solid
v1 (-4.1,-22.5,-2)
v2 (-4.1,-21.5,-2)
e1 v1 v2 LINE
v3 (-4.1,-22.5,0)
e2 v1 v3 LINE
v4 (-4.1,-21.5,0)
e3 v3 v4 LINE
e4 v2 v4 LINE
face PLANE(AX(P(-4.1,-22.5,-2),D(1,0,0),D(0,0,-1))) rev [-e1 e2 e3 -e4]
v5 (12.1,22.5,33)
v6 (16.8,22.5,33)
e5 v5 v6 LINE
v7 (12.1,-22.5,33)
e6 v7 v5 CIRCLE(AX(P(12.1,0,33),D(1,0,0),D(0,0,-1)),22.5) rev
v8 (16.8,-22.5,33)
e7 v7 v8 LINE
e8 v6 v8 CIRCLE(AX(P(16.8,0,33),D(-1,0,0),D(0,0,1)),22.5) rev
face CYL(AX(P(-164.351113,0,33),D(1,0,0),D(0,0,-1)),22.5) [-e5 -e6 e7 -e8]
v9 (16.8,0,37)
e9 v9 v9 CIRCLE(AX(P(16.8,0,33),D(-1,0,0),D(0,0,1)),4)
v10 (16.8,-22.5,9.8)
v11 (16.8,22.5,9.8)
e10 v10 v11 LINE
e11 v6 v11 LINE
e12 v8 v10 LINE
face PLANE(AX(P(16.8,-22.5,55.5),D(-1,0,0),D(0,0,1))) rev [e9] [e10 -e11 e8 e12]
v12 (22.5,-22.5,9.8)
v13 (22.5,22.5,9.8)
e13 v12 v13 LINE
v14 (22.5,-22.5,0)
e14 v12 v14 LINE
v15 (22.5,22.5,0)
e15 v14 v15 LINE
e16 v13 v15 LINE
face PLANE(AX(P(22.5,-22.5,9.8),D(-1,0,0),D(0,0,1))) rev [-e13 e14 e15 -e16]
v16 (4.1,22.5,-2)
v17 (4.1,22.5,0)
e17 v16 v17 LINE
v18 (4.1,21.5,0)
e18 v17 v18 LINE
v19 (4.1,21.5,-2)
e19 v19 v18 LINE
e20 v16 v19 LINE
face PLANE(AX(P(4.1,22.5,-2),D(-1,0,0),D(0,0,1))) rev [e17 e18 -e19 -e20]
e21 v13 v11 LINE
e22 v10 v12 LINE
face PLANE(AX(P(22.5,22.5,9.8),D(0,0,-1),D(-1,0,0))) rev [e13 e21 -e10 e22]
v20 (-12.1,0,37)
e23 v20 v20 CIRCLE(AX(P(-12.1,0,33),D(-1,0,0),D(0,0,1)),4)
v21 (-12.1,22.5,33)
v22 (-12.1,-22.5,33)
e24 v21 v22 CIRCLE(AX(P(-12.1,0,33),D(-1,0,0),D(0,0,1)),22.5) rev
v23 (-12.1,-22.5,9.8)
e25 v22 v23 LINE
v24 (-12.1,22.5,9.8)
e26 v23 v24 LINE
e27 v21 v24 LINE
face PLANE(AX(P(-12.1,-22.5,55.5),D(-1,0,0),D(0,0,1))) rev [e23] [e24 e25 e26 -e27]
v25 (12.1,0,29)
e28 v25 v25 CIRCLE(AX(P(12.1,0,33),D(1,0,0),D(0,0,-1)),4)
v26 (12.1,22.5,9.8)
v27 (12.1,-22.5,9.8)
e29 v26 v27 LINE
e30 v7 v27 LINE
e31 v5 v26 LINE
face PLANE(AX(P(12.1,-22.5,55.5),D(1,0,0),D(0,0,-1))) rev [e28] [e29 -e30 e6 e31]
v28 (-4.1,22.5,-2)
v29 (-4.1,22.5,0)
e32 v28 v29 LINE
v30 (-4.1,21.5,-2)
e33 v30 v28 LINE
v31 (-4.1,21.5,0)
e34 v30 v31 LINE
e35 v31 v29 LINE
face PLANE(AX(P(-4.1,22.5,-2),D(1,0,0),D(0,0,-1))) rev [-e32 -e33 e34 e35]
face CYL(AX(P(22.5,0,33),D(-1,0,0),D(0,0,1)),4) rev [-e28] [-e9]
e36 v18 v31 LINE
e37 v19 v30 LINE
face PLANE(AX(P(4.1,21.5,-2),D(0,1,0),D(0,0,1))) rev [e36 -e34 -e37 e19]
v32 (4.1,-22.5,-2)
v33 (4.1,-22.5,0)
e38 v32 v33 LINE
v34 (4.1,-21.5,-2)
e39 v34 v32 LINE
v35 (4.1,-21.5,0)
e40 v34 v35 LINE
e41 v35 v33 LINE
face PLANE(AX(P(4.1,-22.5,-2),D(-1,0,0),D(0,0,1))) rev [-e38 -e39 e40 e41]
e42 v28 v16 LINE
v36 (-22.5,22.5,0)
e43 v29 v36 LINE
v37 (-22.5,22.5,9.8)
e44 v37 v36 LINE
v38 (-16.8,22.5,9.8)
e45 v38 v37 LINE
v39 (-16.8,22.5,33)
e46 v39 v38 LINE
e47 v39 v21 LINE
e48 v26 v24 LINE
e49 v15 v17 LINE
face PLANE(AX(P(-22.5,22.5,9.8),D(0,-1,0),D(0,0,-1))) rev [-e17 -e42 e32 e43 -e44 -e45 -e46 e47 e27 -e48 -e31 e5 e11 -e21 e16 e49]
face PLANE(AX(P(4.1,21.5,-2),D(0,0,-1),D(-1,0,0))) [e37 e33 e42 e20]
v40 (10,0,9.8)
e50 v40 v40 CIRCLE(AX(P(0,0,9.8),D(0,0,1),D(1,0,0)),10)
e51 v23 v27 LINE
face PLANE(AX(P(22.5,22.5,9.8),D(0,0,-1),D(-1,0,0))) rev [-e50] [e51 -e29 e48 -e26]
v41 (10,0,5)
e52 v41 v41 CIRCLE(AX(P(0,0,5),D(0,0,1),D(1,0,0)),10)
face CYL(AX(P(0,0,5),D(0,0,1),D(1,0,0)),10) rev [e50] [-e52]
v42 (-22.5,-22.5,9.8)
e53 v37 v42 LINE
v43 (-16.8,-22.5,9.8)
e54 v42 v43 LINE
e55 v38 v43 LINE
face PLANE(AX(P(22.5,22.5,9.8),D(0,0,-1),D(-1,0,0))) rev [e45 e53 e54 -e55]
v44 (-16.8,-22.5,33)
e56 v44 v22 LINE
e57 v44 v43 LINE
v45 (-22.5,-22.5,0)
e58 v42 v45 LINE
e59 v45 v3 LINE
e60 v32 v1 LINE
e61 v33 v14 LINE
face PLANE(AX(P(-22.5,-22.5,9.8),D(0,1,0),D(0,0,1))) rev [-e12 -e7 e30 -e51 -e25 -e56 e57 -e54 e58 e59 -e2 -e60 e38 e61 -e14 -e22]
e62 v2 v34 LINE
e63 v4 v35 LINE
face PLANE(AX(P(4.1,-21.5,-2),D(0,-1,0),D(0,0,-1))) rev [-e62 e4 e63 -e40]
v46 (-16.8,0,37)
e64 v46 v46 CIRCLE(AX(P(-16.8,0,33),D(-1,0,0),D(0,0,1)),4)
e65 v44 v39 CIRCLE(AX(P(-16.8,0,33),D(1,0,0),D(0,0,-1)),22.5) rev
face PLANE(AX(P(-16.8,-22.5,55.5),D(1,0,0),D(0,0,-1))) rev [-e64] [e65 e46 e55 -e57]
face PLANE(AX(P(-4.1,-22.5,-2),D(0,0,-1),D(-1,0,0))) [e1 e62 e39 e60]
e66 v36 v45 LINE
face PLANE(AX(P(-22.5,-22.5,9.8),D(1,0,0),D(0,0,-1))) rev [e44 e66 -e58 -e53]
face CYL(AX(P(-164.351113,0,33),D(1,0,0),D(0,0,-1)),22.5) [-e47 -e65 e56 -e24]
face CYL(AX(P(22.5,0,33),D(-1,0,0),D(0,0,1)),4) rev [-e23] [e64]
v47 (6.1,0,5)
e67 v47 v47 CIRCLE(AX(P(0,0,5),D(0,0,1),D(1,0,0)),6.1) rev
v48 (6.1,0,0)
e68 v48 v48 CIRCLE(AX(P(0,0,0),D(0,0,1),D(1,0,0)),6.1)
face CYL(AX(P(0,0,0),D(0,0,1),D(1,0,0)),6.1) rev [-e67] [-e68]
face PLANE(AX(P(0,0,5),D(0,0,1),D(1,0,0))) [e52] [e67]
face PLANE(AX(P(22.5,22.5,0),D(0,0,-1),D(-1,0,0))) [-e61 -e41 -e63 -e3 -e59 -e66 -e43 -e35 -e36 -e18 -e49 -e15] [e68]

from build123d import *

# Parameters (mm, degrees)
SKETCH_1_W          = 45
SKETCH_1_H          = 45
EXTRUDE_1_DEPTH     = 9.8
SKETCH_2_W          = 4.7
SKETCH_2_H          = 45
EXTRUDE_2_DEPTH     = 45.7
CUT_EXTRUDE_START   = -33.6
CUT_EXTRUDE_2_DEPTH = 33.6
SKETCH_4_R          = 4
CUT_EXTRUDE_3_DEPTH = 72.630929074
SKETCH_6_R          = 6.1
CUT_EXTRUDE_5_DEPTH = 56.686533381
SKETCH_7_W          = 8.2
SKETCH_7_H          = 1
EXTRUDE_3_DEPTH     = 2
SKETCH_8_R          = 10
CUT_EXTRUDE_6_DEPTH = 4.8


# Read off the part's stored shape, not the designer's step: 切除-拉伸2
with BuildPart() as part:
    # 草图1 → 凸台-拉伸1 (new body)
    with BuildSketch(Plane.XY):
        Rectangle(SKETCH_1_W, SKETCH_1_H)
    extrude(amount=EXTRUDE_1_DEPTH)

    # 草图2 → 凸台-拉伸2 (add)
    with BuildSketch(Plane.XY.offset(9.8)):
        with Locations((-14.45, 0)):
            Rectangle(SKETCH_2_W, SKETCH_2_H)
        with Locations((14.45, 0)):
            Rectangle(SKETCH_2_W, SKETCH_2_H)
    extrude(amount=EXTRUDE_2_DEPTH)

    # 切除-拉伸2 outline → 切除-拉伸2 (cut)
    with BuildSketch(Plane.ZY.offset(16.8).offset(CUT_EXTRUDE_START)):
        with BuildLine():
            Line((55.5, 22.5), (33, 22.5))
            ThreePointArc((33, 22.5), (48.909902577, 15.909902577), (55.5, 0))
            Line((55.5, 0), (55.5, 22.5))
        make_face()
        with BuildLine():
            Line((55.5, -22.5), (55.5, 0))
            ThreePointArc((55.5, 0), (48.909902577, -15.909902577), (33, -22.5))
            Line((33, -22.5), (55.5, -22.5))
        make_face()
    extrude(amount=CUT_EXTRUDE_2_DEPTH, mode=Mode.SUBTRACT)

    # 草图4 → 切除-拉伸3 (cut, through all)
    with BuildSketch(Plane.ZY.offset(16.8)):
        with Locations((33, 0)):
            Circle(SKETCH_4_R)
    extrude(amount=-CUT_EXTRUDE_3_DEPTH, mode=Mode.SUBTRACT)

    # 草图6 → 切除-拉伸5 (cut, through all)
    with BuildSketch(Plane.XY.offset(9.8)):
        Circle(SKETCH_6_R)
    extrude(amount=-CUT_EXTRUDE_5_DEPTH, mode=Mode.SUBTRACT)

    # 草图7 → 凸台-拉伸3 (add)
    with BuildSketch(Plane(origin=(0, 0, 0), x_dir=(-1, 0, 0), z_dir=(0, 0, -1))):
        with Locations((0, 22)):
            Rectangle(SKETCH_7_W, SKETCH_7_H)
        with Locations((0, -22)):
            Rectangle(SKETCH_7_W, SKETCH_7_H)
    extrude(amount=EXTRUDE_3_DEPTH)

    # 草图8 → 切除-拉伸6 (cut)
    with BuildSketch(Plane.XY.offset(9.8)):
        Circle(SKETCH_8_R)
    extrude(amount=-CUT_EXTRUDE_6_DEPTH, mode=Mode.SUBTRACT)


solid = part.part
